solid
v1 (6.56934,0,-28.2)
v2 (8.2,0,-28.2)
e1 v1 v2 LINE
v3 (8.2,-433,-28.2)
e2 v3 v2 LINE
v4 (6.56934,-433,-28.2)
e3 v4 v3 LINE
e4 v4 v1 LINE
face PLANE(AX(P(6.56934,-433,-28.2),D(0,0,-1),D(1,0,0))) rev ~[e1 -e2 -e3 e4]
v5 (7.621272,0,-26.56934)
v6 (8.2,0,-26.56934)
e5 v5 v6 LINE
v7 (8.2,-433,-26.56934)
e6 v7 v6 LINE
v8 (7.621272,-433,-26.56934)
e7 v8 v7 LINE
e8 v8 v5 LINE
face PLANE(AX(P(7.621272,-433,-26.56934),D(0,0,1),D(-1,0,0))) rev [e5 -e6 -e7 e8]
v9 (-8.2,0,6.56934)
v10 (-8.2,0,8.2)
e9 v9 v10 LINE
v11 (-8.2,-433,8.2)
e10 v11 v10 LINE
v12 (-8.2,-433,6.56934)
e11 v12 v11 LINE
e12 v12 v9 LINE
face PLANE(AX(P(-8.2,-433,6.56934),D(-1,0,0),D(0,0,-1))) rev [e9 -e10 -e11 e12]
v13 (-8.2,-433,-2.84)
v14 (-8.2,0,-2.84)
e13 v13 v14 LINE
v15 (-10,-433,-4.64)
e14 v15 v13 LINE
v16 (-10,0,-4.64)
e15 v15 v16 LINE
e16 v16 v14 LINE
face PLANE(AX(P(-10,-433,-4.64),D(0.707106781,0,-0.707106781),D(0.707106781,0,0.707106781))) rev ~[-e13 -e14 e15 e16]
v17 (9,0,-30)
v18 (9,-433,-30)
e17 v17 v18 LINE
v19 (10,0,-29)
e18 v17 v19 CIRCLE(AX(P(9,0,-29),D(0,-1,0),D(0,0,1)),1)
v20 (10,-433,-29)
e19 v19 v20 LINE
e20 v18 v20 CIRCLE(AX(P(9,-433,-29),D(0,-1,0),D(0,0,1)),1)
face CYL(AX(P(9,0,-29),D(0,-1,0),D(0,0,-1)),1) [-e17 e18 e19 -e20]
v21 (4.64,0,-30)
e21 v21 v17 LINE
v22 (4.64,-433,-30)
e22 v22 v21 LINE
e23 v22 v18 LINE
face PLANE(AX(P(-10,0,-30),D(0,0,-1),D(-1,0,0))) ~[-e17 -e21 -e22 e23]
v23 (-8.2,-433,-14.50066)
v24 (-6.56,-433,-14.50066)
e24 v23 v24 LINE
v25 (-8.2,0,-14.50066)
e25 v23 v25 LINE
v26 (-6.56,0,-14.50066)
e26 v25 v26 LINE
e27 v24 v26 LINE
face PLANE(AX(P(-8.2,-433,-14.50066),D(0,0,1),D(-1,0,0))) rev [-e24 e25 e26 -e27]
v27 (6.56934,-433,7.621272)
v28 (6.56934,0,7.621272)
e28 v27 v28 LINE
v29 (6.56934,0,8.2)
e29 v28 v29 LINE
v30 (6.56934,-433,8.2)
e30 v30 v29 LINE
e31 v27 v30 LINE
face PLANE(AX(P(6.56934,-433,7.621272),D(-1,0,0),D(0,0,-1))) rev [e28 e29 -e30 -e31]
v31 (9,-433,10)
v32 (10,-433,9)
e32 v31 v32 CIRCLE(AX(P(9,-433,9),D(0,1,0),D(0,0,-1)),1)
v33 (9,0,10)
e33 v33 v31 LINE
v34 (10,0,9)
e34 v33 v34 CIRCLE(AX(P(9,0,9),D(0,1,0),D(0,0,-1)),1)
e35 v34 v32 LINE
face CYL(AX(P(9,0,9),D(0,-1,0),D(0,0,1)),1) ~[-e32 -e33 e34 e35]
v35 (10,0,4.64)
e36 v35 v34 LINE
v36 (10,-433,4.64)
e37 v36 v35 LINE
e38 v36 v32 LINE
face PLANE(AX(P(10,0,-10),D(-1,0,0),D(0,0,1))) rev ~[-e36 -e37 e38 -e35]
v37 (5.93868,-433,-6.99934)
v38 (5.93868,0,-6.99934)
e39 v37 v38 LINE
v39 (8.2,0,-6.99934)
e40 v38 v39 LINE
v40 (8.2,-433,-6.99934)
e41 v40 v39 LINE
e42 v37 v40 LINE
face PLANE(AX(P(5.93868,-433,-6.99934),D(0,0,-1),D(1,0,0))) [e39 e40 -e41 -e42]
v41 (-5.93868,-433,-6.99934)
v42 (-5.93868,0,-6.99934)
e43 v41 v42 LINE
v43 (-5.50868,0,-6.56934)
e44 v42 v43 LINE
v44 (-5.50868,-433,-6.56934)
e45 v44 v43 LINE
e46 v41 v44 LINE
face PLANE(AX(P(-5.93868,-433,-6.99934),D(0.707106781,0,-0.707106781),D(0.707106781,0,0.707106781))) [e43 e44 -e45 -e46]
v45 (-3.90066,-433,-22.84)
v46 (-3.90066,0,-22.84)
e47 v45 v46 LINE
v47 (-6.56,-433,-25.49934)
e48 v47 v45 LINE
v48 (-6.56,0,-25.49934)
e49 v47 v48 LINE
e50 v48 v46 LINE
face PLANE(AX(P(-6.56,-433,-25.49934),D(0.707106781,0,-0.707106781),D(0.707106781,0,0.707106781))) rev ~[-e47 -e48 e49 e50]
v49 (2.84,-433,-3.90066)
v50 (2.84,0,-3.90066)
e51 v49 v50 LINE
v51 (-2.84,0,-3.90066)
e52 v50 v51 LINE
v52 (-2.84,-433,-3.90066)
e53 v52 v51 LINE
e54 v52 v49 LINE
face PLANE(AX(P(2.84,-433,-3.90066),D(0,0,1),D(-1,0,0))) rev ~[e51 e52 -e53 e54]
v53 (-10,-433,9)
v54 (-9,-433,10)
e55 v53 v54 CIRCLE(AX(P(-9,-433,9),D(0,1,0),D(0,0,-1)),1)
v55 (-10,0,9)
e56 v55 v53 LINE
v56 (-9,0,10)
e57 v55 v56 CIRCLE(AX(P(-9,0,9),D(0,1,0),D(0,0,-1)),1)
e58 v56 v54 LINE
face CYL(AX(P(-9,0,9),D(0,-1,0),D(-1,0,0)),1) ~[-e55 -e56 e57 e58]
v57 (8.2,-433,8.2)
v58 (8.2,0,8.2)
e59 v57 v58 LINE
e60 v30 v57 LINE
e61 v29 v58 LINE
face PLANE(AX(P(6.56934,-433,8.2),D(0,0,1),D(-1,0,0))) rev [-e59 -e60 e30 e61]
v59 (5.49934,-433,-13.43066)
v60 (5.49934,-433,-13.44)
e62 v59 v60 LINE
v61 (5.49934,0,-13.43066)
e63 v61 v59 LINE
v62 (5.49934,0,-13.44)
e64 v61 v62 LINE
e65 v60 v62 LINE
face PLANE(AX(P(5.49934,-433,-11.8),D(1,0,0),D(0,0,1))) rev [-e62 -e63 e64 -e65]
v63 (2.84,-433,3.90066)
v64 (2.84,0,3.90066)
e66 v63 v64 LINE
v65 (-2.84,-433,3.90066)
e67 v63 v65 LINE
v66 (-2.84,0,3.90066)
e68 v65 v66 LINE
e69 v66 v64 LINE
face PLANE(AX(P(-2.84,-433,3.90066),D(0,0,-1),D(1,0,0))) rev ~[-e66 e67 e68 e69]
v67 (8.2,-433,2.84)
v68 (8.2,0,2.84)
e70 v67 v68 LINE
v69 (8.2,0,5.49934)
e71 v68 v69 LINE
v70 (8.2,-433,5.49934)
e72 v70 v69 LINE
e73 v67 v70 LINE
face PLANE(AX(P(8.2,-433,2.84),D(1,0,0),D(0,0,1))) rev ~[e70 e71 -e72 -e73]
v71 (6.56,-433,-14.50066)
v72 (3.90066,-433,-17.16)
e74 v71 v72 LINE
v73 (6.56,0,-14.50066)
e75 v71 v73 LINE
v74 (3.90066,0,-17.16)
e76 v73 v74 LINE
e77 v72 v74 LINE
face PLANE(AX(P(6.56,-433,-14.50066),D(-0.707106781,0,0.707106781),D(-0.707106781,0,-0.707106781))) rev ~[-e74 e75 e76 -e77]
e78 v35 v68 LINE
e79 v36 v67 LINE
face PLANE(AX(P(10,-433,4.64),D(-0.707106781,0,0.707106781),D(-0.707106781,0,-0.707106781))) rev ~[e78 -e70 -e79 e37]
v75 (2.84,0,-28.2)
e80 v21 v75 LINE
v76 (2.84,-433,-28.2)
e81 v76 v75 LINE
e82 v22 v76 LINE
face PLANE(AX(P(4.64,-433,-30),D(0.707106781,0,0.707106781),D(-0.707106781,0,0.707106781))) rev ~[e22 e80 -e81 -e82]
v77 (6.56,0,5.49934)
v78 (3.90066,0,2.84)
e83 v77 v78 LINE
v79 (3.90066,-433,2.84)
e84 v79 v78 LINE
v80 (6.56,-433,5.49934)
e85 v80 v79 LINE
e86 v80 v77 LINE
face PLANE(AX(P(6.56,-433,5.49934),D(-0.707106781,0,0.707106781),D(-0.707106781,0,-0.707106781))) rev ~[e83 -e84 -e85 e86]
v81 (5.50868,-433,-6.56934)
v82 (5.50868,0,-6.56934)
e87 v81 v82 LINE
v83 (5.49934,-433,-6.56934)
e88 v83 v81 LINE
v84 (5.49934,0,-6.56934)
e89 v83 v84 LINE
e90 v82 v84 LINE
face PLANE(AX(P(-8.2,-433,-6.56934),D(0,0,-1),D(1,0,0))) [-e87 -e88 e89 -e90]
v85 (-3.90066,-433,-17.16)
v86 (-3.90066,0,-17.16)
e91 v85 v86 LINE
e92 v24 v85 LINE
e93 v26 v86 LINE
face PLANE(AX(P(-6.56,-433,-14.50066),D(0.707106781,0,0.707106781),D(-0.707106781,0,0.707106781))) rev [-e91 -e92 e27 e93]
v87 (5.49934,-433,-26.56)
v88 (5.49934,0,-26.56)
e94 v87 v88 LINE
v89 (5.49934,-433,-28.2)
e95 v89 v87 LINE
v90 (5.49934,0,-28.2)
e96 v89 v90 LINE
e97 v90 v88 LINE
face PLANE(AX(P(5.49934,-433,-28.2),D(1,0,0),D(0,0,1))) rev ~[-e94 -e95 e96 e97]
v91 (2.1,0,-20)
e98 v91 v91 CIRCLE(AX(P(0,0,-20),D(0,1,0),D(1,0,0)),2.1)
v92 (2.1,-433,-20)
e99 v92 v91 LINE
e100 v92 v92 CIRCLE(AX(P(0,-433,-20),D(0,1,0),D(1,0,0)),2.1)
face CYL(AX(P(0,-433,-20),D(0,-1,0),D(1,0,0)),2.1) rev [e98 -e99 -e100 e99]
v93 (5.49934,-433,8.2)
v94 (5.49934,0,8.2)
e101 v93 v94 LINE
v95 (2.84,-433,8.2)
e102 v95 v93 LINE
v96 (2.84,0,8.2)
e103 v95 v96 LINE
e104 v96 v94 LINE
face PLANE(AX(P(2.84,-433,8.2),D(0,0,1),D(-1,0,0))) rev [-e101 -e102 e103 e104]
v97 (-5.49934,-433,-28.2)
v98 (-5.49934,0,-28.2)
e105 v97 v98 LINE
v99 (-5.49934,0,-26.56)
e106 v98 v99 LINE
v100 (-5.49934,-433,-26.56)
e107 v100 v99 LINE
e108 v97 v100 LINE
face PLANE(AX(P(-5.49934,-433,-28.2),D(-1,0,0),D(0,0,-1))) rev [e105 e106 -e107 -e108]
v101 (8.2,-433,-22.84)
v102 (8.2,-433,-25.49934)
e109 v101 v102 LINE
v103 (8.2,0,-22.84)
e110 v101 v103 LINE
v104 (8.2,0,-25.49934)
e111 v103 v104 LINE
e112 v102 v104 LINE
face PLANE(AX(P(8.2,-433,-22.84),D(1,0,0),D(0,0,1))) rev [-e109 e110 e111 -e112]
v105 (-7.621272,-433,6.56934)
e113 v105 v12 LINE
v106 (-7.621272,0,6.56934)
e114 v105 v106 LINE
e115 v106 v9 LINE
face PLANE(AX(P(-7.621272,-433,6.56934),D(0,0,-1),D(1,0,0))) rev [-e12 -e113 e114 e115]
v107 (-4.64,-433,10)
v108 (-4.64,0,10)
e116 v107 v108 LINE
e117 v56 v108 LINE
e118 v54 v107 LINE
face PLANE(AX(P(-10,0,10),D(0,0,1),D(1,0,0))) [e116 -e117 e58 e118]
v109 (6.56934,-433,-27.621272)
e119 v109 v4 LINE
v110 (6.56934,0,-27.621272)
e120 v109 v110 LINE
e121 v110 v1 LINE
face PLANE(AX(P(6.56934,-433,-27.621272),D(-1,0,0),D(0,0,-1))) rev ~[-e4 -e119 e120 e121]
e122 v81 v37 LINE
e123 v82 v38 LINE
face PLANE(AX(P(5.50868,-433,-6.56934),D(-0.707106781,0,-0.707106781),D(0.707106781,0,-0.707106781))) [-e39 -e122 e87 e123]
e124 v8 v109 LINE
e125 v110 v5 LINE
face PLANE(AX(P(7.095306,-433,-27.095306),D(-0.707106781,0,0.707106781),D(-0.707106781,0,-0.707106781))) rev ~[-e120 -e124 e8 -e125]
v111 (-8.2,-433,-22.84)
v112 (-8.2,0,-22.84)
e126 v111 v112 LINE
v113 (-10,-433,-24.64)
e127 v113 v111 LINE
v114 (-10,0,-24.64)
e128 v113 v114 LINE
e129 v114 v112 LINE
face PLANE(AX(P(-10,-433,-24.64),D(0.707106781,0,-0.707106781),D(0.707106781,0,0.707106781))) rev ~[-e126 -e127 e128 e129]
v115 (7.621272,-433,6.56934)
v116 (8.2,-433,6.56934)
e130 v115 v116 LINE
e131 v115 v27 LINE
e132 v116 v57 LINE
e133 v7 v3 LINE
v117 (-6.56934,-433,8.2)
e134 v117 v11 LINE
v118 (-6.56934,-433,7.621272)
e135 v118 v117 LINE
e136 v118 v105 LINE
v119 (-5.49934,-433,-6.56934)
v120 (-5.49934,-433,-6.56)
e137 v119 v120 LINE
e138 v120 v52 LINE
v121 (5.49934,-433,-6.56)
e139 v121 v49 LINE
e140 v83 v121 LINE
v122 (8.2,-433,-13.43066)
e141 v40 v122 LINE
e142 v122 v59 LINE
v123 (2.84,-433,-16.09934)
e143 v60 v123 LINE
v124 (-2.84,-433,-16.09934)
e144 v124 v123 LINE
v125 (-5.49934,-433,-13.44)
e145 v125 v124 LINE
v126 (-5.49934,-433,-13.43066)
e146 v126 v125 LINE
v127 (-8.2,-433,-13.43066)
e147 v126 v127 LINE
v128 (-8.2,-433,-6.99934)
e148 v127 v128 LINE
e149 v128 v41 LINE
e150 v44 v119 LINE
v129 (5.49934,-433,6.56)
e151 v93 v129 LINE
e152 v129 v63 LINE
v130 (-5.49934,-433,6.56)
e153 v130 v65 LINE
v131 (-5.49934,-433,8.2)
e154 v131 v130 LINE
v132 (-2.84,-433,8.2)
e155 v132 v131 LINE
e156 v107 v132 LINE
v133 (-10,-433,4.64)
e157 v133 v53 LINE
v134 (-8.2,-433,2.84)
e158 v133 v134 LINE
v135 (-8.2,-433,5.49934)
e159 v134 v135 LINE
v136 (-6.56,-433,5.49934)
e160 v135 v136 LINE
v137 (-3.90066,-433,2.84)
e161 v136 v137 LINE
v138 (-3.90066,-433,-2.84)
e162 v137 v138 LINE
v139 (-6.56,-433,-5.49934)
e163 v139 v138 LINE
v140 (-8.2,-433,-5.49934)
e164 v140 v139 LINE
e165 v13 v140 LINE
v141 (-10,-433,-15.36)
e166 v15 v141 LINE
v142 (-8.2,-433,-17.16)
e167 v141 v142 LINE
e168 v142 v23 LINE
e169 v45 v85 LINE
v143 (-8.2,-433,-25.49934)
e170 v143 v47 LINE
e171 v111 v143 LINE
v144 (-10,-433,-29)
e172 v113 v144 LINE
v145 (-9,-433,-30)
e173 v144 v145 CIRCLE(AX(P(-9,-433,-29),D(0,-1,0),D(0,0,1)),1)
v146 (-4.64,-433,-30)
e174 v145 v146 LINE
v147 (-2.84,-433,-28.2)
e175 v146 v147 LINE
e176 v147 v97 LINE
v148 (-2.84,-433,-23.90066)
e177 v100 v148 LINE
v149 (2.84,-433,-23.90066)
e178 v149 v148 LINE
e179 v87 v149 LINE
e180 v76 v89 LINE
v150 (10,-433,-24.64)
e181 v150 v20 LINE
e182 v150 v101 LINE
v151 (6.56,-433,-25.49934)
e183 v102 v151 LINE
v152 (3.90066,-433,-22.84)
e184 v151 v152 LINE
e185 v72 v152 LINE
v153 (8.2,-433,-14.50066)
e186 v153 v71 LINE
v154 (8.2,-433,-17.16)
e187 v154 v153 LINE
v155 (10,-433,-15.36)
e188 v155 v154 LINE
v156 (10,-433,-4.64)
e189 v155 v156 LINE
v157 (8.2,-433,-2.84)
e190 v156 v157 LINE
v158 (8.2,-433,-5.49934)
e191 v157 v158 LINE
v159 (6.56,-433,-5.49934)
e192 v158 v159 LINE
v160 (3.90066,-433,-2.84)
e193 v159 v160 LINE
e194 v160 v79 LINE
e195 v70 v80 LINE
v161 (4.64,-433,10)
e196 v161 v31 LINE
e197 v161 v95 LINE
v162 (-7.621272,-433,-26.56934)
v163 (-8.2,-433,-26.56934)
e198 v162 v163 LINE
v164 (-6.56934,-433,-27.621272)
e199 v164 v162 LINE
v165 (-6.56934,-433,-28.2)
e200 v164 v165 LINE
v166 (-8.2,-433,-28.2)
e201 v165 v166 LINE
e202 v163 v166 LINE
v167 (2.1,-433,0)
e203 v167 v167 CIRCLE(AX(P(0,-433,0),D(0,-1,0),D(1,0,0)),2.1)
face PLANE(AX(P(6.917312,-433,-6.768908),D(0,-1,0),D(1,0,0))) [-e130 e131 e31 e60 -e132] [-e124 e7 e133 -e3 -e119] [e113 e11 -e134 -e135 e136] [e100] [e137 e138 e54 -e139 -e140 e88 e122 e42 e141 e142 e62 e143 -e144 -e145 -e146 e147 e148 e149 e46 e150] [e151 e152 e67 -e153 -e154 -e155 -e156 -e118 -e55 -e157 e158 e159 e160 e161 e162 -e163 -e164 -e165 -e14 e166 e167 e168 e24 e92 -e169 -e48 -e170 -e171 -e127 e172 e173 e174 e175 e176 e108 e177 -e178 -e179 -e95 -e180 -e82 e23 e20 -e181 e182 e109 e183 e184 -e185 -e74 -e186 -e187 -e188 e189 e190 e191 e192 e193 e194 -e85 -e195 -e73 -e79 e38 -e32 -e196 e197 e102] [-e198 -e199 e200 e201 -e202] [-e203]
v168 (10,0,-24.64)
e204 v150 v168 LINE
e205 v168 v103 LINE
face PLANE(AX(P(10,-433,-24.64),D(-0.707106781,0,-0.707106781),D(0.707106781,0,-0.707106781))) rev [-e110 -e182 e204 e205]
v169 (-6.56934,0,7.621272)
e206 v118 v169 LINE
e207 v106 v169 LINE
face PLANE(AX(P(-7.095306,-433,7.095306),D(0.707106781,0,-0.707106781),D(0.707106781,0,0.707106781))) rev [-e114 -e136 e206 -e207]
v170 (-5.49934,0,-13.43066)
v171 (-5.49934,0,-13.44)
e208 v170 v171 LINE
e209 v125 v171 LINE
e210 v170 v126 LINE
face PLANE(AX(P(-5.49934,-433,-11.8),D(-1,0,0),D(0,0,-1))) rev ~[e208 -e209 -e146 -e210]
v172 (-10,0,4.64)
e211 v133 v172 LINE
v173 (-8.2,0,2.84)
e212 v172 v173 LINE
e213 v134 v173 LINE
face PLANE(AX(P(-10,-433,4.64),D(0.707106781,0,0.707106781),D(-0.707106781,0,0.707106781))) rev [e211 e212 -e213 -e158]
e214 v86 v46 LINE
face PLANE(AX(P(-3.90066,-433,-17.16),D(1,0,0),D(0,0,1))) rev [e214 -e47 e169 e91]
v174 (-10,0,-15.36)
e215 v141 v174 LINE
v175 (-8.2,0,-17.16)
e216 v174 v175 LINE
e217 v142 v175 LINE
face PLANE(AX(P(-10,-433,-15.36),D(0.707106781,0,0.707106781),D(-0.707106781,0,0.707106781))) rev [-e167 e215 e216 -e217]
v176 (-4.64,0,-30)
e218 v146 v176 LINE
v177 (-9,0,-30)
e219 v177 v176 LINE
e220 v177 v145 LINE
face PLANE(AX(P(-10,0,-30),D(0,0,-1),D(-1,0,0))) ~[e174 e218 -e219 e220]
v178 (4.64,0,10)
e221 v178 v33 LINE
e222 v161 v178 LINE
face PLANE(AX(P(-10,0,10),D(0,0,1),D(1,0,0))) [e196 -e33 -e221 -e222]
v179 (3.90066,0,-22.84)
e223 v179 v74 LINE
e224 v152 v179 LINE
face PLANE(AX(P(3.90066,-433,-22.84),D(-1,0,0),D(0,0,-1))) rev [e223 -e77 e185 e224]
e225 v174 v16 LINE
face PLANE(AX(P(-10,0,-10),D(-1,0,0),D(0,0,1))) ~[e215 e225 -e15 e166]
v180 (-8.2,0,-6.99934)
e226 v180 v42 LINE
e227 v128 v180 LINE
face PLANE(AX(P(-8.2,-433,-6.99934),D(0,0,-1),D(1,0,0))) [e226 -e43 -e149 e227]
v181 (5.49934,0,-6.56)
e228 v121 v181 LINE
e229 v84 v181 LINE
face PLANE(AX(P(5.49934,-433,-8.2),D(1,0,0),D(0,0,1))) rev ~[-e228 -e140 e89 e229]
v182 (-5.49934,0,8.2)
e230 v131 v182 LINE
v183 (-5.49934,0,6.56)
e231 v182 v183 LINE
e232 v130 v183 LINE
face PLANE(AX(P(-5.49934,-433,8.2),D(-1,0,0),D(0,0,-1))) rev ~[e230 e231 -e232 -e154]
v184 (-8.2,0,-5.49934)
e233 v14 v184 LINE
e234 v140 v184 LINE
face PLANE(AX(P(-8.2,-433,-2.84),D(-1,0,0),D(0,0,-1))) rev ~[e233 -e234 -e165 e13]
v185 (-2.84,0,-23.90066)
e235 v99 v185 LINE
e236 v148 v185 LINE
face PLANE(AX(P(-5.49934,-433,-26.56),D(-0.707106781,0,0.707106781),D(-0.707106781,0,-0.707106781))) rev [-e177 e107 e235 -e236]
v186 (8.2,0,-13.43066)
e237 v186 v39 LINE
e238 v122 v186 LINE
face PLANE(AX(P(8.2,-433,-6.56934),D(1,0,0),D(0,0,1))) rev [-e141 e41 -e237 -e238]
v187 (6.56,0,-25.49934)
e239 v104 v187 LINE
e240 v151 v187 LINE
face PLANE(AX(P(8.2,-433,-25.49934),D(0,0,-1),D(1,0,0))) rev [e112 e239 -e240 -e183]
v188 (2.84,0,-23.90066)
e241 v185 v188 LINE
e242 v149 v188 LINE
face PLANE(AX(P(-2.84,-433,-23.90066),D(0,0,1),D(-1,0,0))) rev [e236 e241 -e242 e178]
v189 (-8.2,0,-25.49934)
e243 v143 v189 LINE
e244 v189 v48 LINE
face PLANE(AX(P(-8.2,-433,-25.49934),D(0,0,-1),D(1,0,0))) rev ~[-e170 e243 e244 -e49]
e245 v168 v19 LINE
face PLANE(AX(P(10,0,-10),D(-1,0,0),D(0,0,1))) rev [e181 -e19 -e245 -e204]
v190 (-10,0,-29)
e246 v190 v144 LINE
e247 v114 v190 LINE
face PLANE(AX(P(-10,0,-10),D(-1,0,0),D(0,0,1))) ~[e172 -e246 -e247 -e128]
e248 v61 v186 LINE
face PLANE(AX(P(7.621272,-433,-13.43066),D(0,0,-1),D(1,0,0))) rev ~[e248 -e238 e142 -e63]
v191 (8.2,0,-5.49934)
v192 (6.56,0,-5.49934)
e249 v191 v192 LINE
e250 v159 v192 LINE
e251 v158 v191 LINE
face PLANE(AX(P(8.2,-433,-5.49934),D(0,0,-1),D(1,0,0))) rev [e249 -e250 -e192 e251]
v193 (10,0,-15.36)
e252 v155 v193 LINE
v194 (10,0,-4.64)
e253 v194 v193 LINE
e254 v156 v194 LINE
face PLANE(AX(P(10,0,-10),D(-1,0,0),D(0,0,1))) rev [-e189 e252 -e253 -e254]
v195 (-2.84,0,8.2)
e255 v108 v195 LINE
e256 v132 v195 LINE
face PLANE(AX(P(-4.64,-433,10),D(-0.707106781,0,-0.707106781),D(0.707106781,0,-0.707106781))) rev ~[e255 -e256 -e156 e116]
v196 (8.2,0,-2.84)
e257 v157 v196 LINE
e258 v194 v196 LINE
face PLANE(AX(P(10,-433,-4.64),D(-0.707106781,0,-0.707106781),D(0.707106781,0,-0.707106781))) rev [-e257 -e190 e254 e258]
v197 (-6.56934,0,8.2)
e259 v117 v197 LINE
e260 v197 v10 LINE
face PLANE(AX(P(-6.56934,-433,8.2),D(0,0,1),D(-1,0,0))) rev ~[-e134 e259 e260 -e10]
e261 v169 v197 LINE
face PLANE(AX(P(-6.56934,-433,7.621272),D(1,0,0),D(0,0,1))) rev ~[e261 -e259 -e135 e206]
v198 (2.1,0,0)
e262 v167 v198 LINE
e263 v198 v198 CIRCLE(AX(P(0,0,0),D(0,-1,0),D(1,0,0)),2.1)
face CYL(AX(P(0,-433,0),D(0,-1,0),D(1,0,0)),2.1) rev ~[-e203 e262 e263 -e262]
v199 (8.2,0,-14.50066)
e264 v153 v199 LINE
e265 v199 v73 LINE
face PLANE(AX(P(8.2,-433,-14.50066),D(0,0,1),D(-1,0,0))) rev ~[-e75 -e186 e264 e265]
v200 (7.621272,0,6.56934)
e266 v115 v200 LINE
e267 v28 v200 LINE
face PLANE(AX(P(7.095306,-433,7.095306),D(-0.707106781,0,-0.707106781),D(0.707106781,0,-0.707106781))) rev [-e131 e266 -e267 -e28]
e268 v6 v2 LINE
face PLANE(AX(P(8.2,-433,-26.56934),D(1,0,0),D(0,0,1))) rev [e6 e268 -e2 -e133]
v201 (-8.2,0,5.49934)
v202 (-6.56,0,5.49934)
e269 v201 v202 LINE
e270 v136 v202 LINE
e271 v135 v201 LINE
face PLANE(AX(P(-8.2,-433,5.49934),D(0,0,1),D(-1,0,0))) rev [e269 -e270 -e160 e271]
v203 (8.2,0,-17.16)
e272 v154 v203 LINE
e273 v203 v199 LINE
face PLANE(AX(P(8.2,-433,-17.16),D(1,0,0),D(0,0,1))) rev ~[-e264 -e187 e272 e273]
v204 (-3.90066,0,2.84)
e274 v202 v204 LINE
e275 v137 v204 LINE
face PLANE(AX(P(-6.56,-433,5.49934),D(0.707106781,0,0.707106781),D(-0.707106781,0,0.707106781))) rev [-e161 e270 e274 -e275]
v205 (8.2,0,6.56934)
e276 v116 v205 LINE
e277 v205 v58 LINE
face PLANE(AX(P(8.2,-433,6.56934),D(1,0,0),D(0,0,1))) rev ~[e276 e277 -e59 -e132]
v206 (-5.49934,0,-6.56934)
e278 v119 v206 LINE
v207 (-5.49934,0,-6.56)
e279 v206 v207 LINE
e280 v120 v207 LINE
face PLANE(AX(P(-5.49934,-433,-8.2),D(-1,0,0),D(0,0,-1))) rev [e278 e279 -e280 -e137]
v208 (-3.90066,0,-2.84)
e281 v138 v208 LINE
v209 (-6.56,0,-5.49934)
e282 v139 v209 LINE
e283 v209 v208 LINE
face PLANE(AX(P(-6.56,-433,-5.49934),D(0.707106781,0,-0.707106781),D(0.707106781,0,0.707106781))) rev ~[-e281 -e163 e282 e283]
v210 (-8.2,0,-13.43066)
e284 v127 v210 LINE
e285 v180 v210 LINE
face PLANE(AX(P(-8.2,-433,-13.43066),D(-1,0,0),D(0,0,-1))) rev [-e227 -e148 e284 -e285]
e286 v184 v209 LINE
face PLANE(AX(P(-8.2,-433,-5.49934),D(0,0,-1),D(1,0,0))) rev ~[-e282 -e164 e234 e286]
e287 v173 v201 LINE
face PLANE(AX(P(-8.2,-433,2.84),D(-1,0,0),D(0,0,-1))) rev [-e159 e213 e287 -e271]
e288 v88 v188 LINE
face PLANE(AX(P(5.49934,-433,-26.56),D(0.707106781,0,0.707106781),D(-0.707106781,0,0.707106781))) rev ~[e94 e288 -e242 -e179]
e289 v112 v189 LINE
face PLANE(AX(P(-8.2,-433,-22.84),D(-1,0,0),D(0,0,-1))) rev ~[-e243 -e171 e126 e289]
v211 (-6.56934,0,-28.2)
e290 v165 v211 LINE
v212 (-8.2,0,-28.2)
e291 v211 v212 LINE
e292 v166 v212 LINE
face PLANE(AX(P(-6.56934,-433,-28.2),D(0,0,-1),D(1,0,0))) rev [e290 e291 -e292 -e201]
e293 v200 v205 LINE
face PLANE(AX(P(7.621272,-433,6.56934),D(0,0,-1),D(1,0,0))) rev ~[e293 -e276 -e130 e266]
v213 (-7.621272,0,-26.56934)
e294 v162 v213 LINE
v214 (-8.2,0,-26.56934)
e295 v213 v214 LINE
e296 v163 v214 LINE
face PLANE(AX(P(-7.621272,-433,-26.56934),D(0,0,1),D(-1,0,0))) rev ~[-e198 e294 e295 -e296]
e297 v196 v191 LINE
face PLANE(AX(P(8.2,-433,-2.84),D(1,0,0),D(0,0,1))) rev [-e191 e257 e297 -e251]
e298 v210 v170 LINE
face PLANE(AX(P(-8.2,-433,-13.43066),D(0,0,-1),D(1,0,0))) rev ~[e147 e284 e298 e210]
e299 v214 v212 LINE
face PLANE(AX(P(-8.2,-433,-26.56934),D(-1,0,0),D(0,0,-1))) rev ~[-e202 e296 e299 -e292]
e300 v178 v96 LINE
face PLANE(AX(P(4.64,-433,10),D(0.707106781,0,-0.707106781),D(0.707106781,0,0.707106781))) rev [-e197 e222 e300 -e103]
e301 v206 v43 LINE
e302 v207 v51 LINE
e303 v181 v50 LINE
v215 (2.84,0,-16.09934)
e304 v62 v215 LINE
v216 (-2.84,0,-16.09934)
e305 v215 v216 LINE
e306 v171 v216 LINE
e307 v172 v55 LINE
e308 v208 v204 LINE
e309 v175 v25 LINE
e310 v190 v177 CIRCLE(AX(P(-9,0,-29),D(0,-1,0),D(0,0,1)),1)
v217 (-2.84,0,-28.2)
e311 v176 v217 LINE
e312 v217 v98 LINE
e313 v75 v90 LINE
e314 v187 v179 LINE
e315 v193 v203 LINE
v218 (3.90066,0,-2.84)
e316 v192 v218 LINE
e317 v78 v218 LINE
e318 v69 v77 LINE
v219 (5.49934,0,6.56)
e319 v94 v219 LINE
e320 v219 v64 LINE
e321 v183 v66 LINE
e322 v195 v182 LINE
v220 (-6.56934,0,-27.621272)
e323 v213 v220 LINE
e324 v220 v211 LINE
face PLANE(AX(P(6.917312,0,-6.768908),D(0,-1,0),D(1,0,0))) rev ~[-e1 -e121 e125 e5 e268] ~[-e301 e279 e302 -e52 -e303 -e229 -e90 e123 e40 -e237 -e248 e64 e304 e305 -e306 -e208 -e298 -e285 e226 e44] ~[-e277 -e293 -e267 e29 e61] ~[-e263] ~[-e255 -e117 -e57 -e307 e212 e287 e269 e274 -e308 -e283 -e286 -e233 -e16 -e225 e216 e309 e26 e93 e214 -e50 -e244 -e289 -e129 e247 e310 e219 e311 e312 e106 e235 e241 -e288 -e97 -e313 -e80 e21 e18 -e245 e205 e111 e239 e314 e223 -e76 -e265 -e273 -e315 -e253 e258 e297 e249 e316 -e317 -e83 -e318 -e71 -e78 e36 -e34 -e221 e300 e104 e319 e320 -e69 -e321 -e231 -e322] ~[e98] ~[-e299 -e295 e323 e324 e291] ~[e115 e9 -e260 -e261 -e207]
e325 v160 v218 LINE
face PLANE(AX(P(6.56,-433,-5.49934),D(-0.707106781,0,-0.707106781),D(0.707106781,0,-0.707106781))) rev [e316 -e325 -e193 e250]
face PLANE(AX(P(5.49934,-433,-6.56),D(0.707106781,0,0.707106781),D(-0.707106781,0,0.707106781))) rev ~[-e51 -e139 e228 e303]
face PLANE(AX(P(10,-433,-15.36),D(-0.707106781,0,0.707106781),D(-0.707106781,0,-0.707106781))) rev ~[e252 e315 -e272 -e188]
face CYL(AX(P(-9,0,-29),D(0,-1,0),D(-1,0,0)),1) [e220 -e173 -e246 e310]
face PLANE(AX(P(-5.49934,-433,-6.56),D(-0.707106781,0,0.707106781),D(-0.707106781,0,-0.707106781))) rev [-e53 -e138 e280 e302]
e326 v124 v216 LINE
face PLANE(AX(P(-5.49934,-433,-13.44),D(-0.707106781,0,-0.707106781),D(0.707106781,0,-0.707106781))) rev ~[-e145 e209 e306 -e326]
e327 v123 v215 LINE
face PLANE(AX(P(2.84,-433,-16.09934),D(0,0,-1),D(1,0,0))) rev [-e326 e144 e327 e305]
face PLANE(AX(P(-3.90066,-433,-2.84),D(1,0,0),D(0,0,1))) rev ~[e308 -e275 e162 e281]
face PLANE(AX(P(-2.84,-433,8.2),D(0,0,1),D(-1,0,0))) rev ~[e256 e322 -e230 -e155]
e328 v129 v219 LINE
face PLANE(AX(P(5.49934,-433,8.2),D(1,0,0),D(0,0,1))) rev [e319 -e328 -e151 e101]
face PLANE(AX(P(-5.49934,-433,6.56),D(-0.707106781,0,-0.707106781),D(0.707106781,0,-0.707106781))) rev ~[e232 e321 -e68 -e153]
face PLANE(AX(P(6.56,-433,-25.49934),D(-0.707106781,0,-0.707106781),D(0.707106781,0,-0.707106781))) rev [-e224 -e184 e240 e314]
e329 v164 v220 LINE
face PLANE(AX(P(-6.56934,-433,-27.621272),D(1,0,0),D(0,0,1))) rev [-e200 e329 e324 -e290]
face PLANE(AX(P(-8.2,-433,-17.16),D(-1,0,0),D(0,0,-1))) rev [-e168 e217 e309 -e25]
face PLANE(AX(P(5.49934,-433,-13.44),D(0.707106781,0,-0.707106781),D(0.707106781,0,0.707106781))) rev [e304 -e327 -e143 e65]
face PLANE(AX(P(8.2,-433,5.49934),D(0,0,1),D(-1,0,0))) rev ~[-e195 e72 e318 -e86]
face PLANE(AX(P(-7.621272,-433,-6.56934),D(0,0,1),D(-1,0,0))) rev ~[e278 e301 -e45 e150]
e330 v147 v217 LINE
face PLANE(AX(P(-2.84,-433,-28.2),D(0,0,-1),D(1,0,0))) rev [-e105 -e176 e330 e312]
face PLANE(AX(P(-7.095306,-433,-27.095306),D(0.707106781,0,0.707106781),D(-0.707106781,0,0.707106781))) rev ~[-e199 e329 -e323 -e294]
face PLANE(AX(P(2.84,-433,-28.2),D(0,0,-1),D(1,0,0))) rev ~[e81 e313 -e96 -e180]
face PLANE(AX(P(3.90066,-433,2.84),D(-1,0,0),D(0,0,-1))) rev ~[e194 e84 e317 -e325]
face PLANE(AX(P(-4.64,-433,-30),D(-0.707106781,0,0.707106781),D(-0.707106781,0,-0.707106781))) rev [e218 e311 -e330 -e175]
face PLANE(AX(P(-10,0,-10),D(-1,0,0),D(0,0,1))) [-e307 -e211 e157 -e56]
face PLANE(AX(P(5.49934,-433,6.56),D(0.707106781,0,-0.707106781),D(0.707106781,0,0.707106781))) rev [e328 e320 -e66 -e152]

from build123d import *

# Parameters (mm, degrees)
F0_W             = 20
F0_H             = 20
F1_DEPTH         = 433
F2_R             = 2.1
F3_DEPTH         = 433.001
F4_R             = 1
F6_DEPTH         = 433.001
F6_COPIES3_COUNT = 2
F6_COPIES3_ANGLE = 90
F6_COPIES4_COUNT = 2
F6_COPIES4_ANGLE = 270
F6_COPIES6_COUNT = 2
F9_W             = 16.4
F9_H             = 6.8613203436
F10_DEPTH        = 433.001
F12_DEPTH        = 433


# Not quite as in the source:
# - a pattern or mirror of a feature is missing from the dataset's text; its kind, count and spacing are read off the source's solid


with BuildPart() as f1:
    # F0 (on Front) → F1 (new body)
    with BuildSketch(Plane.XZ):
        Rectangle(F0_W, F0_H)
    extrude(amount=F1_DEPTH)

    # F2 (on face) → F3 (cut, through all)
    with BuildSketch(Plane.XZ.offset(433)):
        Circle(F2_R)
    extrude(amount=-F3_DEPTH, mode=Mode.SUBTRACT)

    # F4
    f4_edges = [f1.edges().sort_by_distance(p)[0] for p in [
        (-10, -216.5, 10),
        (10, -216.5, 10),
    ]]
    fillet(f4_edges, radius=F4_R)

    # F5 (on face) → F6 (cut, through all)
    with BuildSketch(Plane.XZ.offset(433)):
        Polygon((0, 3.9006601718), (0, 10), (-2.84, 10), (-4.64, 10), (-2.84, 8.2), (-5.4993398282, 8.2), (-5.4993398282, 6.56), (-2.84, 3.9006601718), align=None)
        Polygon((-6.5693398282, 8.2), (-8.2, 8.2), (-7.0953059148, 7.0953059148), (-6.5693398282, 7.6212720014), align=None)
    f6 = extrude(amount=-F6_DEPTH, mode=Mode.SUBTRACT)

    # F6_copies: F6 across plane
    add(f6.mirror(Plane(origin=(0, 0, 0), x_dir=(-0.7071067812, 0, -0.7071067812), z_dir=(0.7071067812, 0, -0.7071067812))), mode=Mode.SUBTRACT)

    # F6_copies1: F6 across plane
    add(f6.mirror(Plane(origin=(0, 0, 0), x_dir=(0.7071067812, 0, -0.7071067812), z_dir=(-0.7071067812, 0, -0.7071067812))), mode=Mode.SUBTRACT)

    # F6_copies2: F6 across plane
    add(f6.mirror(Plane(origin=(0, 0, 0), x_dir=(0, 0, 1), z_dir=(1, 0, 0))), mode=Mode.SUBTRACT)

    # F6_copies3: F6 ×2 about axis
    f6_copies3_axis = Axis((0, 0, 0), (0, 1, 0))
    for i in range(1, F6_COPIES3_COUNT):
        add(f6.rotate(f6_copies3_axis, i * F6_COPIES3_ANGLE / (F6_COPIES3_COUNT - 1)), mode=Mode.SUBTRACT)

    # F6_copies4: F6 ×2 about axis
    f6_copies4_axis = Axis((0, 0, 0), (0, 1, 0))
    for i in range(1, F6_COPIES4_COUNT):
        add(f6.rotate(f6_copies4_axis, i * F6_COPIES4_ANGLE / (F6_COPIES4_COUNT - 1)), mode=Mode.SUBTRACT)

    # F6_copies5: F6 across plane
    add(f6.mirror(Plane(origin=(0, 0, 0), x_dir=(-1, 0, 0), z_dir=(0, 0, -1))), mode=Mode.SUBTRACT)

    # F6_copies6: F6 ×2 about axis
    f6_copies6_axis = Axis((0, 0, 0), (0, 1, 0))
    for i in range(1, F6_COPIES6_COUNT):
        add(f6.rotate(f6_copies6_axis, i * 360 / F6_COPIES6_COUNT), mode=Mode.SUBTRACT)

    # F8: F1 across face


with BuildPart() as f1_1:
    add(f1.part)
    add(f1.part.mirror(Plane(origin=(-7.32, -216.5, -10), x_dir=(1, 0, 0), z_dir=(0, 0, -1))))

    # F9 (on face) → F10 (cut, through all)
    with BuildSketch(Plane.XZ.offset(433)):
        with Locations((0, -10)):
            Rectangle(F9_W, F9_H)
    extrude(amount=-F10_DEPTH, mode=Mode.SUBTRACT)

    # F11 (on face) → F12 (join, through all)
    with BuildSketch(Plane.XZ.offset(433)):
        with BuildLine():
            ThreePointArc((-9, -10), (-9.7071067812, -9.7071067812), (-10, -9))
            Line((-10, -9), (-10, -11))
            ThreePointArc((-10, -11), (-9.7071067812, -10.2928932188), (-9, -10))
        make_face()
        with BuildLine():
            ThreePointArc((10, -9), (9.7071067812, -9.7071067812), (9, -10))
            ThreePointArc((9, -10), (9.7071067812, -10.2928932188), (10, -11))
            Line((10, -11), (10, -9))
        make_face()
        Polygon((5.9386796564, -6.9993398282), (8.2, -6.9993398282), (8.2, -6.5693398282), (5.5086796564, -6.5693398282), align=None)
        Polygon((-8.2, -6.5693398282), (-8.2, -6.9993398282), (-5.9386796564, -6.9993398282), (-5.5086796564, -6.5693398282), align=None)
    extrude(amount=-F12_DEPTH)


solid = f1_1.part
